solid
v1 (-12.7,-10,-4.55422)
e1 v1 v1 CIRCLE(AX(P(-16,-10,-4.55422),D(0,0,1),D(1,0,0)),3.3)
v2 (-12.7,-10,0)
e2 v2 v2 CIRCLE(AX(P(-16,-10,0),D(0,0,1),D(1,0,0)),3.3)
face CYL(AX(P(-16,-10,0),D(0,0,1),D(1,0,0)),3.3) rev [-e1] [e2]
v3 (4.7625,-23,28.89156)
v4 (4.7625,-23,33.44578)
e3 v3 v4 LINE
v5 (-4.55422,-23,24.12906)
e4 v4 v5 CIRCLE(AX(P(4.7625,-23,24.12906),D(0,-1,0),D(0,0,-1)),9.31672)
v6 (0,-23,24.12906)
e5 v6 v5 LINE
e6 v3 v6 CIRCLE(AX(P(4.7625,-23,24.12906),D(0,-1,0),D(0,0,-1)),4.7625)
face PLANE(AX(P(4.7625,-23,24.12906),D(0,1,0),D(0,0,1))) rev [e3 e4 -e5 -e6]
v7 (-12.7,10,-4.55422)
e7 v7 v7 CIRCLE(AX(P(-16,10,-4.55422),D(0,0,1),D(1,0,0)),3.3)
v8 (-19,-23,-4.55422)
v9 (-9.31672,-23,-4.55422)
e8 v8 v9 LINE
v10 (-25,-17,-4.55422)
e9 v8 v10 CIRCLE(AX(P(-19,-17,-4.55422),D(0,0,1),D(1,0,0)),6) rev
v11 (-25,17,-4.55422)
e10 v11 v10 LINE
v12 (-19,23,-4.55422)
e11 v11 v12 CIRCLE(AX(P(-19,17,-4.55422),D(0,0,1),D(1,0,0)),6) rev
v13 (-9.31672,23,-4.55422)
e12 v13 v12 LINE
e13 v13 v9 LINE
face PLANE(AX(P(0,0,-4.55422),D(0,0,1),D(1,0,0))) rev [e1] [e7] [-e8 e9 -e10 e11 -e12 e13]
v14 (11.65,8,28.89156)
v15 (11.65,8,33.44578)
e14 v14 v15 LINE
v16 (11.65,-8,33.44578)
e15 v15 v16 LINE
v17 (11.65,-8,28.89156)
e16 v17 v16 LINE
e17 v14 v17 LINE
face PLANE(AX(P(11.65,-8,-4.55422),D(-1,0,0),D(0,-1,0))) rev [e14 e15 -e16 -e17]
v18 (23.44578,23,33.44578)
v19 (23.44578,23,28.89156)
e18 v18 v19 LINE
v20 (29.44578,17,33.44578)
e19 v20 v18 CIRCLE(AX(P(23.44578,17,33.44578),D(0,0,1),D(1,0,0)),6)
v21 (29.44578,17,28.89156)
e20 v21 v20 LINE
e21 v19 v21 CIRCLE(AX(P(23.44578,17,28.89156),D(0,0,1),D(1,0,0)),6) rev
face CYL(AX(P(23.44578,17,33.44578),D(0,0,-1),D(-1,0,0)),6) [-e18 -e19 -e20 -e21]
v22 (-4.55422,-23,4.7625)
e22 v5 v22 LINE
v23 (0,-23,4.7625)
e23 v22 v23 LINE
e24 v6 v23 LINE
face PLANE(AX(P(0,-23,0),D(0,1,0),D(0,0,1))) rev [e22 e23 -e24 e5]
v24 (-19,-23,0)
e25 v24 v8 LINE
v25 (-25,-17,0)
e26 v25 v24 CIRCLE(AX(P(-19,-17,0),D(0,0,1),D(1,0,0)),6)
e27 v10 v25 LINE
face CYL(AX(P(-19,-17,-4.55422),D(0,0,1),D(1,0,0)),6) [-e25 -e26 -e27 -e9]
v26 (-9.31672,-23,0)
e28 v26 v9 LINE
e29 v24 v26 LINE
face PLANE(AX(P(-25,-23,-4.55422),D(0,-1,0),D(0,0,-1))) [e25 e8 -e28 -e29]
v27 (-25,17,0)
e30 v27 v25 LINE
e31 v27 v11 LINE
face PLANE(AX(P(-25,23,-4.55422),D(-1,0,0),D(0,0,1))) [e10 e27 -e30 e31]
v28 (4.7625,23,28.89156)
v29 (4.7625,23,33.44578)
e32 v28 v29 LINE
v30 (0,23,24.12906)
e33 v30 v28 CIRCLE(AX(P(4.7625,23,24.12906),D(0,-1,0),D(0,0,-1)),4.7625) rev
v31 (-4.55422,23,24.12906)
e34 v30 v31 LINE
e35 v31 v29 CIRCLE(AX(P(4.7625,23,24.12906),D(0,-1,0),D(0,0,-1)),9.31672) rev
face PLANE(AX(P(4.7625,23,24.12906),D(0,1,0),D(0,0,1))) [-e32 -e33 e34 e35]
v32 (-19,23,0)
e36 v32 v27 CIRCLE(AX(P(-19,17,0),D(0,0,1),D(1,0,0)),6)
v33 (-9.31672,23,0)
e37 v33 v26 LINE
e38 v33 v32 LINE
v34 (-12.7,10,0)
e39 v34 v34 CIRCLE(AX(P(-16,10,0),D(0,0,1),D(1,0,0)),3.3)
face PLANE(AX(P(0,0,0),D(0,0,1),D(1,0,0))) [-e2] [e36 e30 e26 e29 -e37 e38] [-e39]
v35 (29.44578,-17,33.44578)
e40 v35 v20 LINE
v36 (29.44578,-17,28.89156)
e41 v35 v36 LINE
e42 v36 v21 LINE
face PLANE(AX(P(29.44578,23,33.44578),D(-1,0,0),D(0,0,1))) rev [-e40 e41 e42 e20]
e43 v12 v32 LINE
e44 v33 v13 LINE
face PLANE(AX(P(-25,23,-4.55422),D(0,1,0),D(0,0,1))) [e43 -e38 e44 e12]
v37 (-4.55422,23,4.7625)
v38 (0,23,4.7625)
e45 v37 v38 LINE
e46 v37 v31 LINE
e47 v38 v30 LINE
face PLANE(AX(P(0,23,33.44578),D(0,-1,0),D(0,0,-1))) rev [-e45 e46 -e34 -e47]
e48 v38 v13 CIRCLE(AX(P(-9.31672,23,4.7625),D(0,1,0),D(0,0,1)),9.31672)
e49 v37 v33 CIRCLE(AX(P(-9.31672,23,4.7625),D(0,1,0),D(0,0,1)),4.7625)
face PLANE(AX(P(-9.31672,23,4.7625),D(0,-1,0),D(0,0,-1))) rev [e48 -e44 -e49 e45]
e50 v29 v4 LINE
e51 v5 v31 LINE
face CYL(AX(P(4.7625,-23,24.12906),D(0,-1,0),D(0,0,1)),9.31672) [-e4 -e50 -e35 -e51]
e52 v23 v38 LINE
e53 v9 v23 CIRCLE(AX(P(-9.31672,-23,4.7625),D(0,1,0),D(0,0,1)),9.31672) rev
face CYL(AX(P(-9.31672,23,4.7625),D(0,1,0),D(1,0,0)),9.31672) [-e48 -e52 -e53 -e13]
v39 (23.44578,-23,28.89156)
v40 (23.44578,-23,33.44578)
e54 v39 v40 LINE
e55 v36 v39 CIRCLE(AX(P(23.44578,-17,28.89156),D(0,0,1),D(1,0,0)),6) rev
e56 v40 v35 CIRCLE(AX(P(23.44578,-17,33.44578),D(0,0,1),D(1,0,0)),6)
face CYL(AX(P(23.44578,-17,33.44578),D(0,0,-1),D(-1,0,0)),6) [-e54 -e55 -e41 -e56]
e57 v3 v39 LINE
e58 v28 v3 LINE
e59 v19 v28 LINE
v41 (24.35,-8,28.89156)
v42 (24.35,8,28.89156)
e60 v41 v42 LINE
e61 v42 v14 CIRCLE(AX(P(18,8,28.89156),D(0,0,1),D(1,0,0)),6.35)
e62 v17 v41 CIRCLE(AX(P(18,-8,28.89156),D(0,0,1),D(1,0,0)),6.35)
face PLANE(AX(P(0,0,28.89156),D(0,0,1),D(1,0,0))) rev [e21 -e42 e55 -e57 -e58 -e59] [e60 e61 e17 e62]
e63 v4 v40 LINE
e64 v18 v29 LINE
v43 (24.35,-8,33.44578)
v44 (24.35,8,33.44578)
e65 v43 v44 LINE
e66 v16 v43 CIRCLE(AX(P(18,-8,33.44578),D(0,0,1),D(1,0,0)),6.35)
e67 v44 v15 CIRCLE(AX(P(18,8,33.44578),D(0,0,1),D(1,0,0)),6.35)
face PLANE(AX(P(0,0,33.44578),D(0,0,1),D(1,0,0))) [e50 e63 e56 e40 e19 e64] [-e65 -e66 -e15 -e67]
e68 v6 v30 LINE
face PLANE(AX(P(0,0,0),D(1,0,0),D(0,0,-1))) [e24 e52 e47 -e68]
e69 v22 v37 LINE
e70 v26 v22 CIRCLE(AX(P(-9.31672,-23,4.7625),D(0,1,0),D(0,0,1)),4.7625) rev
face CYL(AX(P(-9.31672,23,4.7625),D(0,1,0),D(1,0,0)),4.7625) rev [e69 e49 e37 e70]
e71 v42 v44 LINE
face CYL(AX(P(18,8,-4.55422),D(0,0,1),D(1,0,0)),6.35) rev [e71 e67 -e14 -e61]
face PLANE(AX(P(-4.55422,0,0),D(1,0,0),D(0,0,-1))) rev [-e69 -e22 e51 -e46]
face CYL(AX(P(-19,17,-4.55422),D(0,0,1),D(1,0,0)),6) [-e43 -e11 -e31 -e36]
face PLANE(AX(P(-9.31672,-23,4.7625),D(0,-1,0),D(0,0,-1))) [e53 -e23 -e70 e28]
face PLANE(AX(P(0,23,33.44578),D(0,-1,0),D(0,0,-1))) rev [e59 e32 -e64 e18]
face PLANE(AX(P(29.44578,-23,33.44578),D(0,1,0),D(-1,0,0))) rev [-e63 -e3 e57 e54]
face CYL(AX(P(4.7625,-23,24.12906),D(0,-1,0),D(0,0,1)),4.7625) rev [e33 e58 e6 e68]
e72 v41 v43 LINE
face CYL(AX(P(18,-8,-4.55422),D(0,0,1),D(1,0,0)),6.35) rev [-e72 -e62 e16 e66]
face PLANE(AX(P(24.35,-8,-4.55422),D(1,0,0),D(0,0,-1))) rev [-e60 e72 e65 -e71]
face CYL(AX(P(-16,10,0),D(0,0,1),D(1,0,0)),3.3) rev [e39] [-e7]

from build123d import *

# Parameters (mm, degrees)
SKETCH1_W                    = 25
SKETCH1_H                    = 46
BASE_FLANGE1_DEPTH           = 4.55422
EDGE_FLANGE2_STRIP_W         = 27.74188
EDGE_FLANGE2_STRIP_H         = 4.55422
EDGE_FLANGE2_STRIP_CUT_DEPTH = 46
EDGE_FLANGE2_DEPTH           = 46
EDGE_FLANGE3_STRIP_W         = 27.74188
EDGE_FLANGE3_STRIP_H         = 4.55422
EDGE_FLANGE3_STRIP_CUT_DEPTH = 46
EDGE_FLANGE3_DEPTH           = 46
FILLET1_R                    = 6
M6_CLEARANCE_HOLE1_D         = 6.6
CUT_EXTRUDE1_DEPTH           = 76.830940915


# Sheet-metal steps are written as plain solids
with BuildPart() as part:
    # Sketch1 → Base-Flange1 (new body)
    with BuildSketch(Plane.XY):
        with Locations((-12.5, 0)):
            Rectangle(SKETCH1_W, SKETCH1_H)
    extrude(amount=-BASE_FLANGE1_DEPTH)

    # Edge-Flange2 strip (across the edge) → Edge-Flange2 strip cut (cut)
    with BuildSketch(Plane(origin=(0, -23, 0), x_dir=(-1, 0, 0), z_dir=(0, 1, 0))):
        with Locations((-4.55422, -2.27711)):
            Rectangle(EDGE_FLANGE2_STRIP_W, EDGE_FLANGE2_STRIP_H)
    extrude(amount=EDGE_FLANGE2_STRIP_CUT_DEPTH, mode=Mode.SUBTRACT)

    # Edge-Flange2 section (across the edge) → Edge-Flange2 (add)
    with BuildSketch(Plane(origin=(0, -23, 0), x_dir=(-1, 0, 0), z_dir=(0, 1, 0))):
        with BuildLine():
            Line((0, 4.7625), (0, 33.44578))
            Line((0, 33.44578), (4.55422, 33.44578))
            Line((4.55422, 33.44578), (4.55422, 4.7625))
            ThreePointArc((4.55422, 4.7625), (5.949123955, 1.394903955), (9.31672, 0))
            Line((9.31672, 0), (9.31672, -4.55422))
            ThreePointArc((9.31672, -4.55422), (2.72880411, -1.82541589), (0, 4.7625))
        make_face()
    extrude(amount=EDGE_FLANGE2_DEPTH)

    # Edge-Flange3 strip (across the edge) → Edge-Flange3 strip cut (cut)
    with BuildSketch(Plane(origin=(0, 23, 33.44578), x_dir=(0, 0, -1), z_dir=(0, -1, 0))):
        with Locations((-4.55422, -2.27711)):
            Rectangle(EDGE_FLANGE3_STRIP_W, EDGE_FLANGE3_STRIP_H)
    extrude(amount=EDGE_FLANGE3_STRIP_CUT_DEPTH, mode=Mode.SUBTRACT)

    # Edge-Flange3 section (across the edge) → Edge-Flange3 (add)
    with BuildSketch(Plane(origin=(0, 23, 33.44578), x_dir=(0, 0, -1), z_dir=(0, -1, 0))):
        with BuildLine():
            Line((0, 4.7625), (0, 29.44578))
            Line((0, 29.44578), (4.55422, 29.44578))
            Line((4.55422, 29.44578), (4.55422, 4.7625))
            ThreePointArc((4.55422, 4.7625), (5.949123955, 1.394903955), (9.31672, 0))
            Line((9.31672, 0), (9.31672, -4.55422))
            ThreePointArc((9.31672, -4.55422), (2.72880411, -1.82541589), (0, 4.7625))
        make_face()
    extrude(amount=EDGE_FLANGE3_DEPTH)

    # Fillet1
    fillet1_edges = [part.edges().sort_by_distance(p)[0] for p in [
        (29.44578, 23, 31.16867),
        (29.44578, -23, 31.16867),
        (-25, 23, -2.27711),
        (-25, -23, -2.27711),
    ]]
    fillet(fillet1_edges, radius=FILLET1_R)

    # M6 Clearance Hole1 (through all)
    with Locations(Plane.XY):
        with Locations((-16, 10), (-16, -10)):
            Hole(M6_CLEARANCE_HOLE1_D / 2)

    # Sketch12 → Cut-Extrude1 (cut, through all)
    with BuildSketch(Plane(origin=(-32.01422, 0, 33.44578), x_dir=(1, 0, 0), z_dir=(0, 0, 1))):
        with BuildLine():
            Line((43.66422, -8), (43.66422, 8))
            ThreePointArc((43.66422, 8), (50.01422, 14.35), (56.36422, 8))
            Line((56.36422, 8), (56.36422, -8))
            ThreePointArc((56.36422, -8), (50.01422, -14.35), (43.66422, -8))
        make_face()
    extrude(amount=-CUT_EXTRUDE1_DEPTH, mode=Mode.SUBTRACT)


solid = part.part
